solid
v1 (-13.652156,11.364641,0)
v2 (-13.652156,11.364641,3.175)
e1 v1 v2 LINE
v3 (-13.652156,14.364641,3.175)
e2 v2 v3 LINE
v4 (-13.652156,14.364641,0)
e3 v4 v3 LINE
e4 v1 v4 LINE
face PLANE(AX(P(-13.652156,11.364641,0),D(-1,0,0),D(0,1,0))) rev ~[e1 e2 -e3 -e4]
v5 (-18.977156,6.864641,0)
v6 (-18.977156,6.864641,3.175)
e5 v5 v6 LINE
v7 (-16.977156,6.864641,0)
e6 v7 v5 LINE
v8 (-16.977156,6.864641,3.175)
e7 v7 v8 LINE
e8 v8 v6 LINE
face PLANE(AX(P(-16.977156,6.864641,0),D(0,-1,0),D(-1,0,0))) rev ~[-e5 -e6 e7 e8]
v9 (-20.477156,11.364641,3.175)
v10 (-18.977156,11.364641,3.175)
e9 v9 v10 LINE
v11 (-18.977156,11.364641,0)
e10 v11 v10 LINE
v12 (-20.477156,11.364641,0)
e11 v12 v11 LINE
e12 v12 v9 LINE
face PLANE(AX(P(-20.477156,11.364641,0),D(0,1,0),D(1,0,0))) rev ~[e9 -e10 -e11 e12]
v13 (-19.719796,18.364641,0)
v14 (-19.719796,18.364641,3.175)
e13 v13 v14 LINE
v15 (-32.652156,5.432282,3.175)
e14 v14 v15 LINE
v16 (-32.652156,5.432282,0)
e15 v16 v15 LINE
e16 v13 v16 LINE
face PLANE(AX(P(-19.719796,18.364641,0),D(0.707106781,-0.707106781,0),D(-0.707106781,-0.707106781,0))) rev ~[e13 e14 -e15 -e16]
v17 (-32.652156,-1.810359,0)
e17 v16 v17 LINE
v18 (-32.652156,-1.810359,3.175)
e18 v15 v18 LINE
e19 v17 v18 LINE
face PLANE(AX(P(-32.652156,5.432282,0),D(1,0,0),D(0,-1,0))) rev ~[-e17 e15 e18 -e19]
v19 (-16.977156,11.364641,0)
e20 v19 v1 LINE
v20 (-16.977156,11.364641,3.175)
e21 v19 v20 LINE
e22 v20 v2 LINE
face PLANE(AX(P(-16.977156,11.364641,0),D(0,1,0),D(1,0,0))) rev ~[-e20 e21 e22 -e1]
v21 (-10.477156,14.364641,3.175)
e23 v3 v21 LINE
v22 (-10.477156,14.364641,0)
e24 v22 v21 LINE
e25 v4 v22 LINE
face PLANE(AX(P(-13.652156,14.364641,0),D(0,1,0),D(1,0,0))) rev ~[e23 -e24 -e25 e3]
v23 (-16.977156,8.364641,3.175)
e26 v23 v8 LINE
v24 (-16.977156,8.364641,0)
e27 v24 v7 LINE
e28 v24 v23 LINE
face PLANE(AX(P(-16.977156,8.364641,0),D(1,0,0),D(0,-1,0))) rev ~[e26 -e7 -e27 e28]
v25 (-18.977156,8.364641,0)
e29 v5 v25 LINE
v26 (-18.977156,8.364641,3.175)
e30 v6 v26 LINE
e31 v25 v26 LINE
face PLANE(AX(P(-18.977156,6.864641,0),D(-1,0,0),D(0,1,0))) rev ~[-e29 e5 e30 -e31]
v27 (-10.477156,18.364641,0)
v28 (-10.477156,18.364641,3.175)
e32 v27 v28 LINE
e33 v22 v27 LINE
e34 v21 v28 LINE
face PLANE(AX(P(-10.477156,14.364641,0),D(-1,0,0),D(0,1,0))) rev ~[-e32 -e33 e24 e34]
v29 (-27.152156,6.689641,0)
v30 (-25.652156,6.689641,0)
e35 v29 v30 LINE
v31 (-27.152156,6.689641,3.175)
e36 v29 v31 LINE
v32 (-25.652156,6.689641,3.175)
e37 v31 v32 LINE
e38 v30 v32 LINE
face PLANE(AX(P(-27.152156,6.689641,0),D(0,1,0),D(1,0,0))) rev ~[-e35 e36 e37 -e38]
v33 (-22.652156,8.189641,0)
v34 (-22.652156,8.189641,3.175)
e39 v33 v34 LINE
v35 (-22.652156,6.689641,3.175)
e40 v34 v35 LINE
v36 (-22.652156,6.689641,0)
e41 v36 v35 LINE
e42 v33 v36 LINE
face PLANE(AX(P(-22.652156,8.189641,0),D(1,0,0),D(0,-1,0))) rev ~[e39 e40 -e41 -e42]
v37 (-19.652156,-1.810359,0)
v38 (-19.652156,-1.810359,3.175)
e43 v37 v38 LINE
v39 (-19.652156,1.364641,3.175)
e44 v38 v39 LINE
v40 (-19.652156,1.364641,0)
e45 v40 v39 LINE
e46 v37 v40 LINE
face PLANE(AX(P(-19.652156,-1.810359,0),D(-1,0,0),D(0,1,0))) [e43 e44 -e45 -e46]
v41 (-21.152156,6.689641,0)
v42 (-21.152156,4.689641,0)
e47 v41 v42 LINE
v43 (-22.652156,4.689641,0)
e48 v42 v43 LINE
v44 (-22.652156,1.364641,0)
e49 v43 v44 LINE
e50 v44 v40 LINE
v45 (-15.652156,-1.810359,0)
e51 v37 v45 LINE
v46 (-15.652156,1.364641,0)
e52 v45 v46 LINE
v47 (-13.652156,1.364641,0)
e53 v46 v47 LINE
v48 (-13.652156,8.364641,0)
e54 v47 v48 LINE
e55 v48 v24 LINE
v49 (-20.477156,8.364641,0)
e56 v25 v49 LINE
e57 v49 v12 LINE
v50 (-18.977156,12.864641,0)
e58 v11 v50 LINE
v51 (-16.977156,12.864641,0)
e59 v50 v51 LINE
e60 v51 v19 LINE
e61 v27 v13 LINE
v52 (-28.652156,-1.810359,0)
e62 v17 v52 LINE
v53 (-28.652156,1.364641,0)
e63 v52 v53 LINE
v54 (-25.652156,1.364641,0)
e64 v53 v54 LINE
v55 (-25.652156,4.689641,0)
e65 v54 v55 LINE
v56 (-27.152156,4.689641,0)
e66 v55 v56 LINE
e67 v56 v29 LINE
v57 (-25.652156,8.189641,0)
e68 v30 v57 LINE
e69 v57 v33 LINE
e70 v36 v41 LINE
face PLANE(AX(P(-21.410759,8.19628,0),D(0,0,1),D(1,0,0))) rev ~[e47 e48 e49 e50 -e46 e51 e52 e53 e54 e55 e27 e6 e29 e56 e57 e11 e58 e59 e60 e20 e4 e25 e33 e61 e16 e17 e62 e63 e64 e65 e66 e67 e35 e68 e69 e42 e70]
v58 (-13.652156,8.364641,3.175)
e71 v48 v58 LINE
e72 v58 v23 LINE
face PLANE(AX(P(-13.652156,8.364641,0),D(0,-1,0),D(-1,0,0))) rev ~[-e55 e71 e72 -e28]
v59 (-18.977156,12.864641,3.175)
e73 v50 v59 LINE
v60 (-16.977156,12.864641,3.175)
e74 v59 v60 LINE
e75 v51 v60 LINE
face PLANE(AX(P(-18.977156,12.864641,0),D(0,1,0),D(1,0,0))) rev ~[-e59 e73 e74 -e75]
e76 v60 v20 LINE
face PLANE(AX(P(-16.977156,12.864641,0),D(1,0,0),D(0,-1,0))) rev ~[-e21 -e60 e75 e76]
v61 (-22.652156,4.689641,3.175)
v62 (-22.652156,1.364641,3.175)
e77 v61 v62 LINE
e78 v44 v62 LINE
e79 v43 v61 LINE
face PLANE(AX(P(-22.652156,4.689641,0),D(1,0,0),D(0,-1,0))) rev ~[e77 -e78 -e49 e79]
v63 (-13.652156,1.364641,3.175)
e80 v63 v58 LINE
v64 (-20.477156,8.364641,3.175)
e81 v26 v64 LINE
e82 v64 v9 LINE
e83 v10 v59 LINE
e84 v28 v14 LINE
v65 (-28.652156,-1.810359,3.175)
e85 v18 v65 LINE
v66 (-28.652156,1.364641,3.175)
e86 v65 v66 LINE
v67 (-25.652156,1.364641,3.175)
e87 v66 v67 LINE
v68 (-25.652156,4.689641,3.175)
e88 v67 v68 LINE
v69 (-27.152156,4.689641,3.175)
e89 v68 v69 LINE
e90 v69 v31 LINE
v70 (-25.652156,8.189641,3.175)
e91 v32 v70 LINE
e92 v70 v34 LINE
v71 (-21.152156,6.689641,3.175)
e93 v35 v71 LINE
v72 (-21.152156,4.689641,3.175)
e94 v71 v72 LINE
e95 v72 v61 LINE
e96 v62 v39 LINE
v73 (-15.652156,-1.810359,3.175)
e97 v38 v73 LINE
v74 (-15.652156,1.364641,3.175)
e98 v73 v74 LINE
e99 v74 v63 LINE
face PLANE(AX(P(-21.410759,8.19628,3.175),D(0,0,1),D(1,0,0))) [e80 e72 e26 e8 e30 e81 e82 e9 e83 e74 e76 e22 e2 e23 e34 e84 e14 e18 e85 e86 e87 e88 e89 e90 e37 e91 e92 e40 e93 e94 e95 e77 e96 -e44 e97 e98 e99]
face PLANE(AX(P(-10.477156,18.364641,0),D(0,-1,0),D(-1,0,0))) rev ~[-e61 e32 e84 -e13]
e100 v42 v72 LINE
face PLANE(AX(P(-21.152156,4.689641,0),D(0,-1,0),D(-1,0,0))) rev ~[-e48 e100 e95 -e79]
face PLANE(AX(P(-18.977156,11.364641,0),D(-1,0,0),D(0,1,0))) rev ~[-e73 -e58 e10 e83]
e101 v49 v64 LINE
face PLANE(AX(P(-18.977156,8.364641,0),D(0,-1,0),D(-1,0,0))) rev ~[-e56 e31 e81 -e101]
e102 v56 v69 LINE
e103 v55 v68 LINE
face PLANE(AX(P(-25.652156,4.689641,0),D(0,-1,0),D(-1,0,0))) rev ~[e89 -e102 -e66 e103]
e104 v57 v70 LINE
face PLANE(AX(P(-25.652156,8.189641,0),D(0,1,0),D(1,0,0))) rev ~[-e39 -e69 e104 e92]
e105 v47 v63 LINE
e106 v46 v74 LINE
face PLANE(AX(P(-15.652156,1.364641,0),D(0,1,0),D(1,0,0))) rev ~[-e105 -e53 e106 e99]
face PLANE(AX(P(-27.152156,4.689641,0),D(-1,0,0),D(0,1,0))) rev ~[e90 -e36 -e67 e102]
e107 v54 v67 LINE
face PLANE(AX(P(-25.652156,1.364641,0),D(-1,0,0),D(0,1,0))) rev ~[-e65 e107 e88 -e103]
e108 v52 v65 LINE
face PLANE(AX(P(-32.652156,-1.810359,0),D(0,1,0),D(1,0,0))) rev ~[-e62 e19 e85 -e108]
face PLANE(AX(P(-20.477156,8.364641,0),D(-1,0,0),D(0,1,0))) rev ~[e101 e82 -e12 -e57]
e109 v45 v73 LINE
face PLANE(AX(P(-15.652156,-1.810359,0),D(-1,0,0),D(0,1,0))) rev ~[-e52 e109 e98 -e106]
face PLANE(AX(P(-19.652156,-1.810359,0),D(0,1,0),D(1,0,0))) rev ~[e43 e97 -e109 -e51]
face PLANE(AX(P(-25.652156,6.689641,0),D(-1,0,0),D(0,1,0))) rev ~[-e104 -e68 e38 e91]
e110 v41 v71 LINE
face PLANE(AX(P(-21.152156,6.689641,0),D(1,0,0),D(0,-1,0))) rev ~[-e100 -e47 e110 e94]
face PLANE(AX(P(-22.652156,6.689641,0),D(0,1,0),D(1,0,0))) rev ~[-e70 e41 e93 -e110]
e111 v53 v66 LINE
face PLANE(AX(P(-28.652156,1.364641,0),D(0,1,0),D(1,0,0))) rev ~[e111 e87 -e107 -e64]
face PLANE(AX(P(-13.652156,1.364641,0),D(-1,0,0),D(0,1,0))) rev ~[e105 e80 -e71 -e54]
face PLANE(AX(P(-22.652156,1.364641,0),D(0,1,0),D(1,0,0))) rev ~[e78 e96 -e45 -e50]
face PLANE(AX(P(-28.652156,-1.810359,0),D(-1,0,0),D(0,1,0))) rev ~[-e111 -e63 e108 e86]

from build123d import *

# Parameters (mm, degrees)
F0_W     = 4
F0_H     = 3.175
F0_W_2   = 3.175
F0_H_2   = 4
F1_DEPTH = 3.175


# Not quite as in the source:
# - a length typed as a fraction of an inch, garbled in the dataset ("3 / 203.2 mm" for 3/8 in), is restored


with BuildPart() as f1:
    # F0 (on Top) → F1 (new body)
    with BuildSketch(Plane.XY):
        Polygon((-25.6521557152, 6.6896411628), (-25.6521557152, 8.1896411628), (-22.6521557152, 8.1896411628), (-22.6521557152, 6.6896411628), (-21.1521557152, 6.6896411628), (-21.1521557152, 4.6896411628), (-22.6521557152, 4.6896411628), (-22.6521557152, 1.3646411628), (-19.6521557152, 1.3646411628), (-15.6521557152, 1.3646411628), (-13.6521557152, 1.3646411628), (-13.6521557152, 5.3646411628), (-13.6521557152, 8.3646411628), (-16.9771557152, 8.3646411628), (-16.9771557152, 6.8646411628), (-18.9771557152, 6.8646411628), (-18.9771557152, 8.3646411628), (-20.4771557152, 8.3646411628), (-20.4771557152, 11.3646411628), (-18.9771557152, 11.3646411628), (-18.9771557152, 12.8646411628), (-16.9771557152, 12.8646411628), (-16.9771557152, 11.3646411628), (-13.6521557152, 11.3646411628), (-13.6521557152, 14.3646411628), (-13.6521557152, 18.3646411628), (-19.7197964023, 18.3646411628), (-32.6521557152, 5.4322818499), (-32.6521557152, 1.3646411628), (-28.6521557152, 1.3646411628), (-25.6521557152, 1.3646411628), (-25.6521557152, 4.6896411628), (-27.1521557152, 4.6896411628), (-27.1521557152, 6.6896411628), align=None)
        with Locations((-30.6521557152, -0.2228588372)):
            Rectangle(F0_W, F0_H)
        with Locations((-17.6521557152, -0.2228588372)):
            Rectangle(F0_W, F0_H)
        with Locations((-12.0646557152, 16.3646411628)):
            Rectangle(F0_W_2, F0_H_2)
    extrude(amount=F1_DEPTH)


solid = f1.part
